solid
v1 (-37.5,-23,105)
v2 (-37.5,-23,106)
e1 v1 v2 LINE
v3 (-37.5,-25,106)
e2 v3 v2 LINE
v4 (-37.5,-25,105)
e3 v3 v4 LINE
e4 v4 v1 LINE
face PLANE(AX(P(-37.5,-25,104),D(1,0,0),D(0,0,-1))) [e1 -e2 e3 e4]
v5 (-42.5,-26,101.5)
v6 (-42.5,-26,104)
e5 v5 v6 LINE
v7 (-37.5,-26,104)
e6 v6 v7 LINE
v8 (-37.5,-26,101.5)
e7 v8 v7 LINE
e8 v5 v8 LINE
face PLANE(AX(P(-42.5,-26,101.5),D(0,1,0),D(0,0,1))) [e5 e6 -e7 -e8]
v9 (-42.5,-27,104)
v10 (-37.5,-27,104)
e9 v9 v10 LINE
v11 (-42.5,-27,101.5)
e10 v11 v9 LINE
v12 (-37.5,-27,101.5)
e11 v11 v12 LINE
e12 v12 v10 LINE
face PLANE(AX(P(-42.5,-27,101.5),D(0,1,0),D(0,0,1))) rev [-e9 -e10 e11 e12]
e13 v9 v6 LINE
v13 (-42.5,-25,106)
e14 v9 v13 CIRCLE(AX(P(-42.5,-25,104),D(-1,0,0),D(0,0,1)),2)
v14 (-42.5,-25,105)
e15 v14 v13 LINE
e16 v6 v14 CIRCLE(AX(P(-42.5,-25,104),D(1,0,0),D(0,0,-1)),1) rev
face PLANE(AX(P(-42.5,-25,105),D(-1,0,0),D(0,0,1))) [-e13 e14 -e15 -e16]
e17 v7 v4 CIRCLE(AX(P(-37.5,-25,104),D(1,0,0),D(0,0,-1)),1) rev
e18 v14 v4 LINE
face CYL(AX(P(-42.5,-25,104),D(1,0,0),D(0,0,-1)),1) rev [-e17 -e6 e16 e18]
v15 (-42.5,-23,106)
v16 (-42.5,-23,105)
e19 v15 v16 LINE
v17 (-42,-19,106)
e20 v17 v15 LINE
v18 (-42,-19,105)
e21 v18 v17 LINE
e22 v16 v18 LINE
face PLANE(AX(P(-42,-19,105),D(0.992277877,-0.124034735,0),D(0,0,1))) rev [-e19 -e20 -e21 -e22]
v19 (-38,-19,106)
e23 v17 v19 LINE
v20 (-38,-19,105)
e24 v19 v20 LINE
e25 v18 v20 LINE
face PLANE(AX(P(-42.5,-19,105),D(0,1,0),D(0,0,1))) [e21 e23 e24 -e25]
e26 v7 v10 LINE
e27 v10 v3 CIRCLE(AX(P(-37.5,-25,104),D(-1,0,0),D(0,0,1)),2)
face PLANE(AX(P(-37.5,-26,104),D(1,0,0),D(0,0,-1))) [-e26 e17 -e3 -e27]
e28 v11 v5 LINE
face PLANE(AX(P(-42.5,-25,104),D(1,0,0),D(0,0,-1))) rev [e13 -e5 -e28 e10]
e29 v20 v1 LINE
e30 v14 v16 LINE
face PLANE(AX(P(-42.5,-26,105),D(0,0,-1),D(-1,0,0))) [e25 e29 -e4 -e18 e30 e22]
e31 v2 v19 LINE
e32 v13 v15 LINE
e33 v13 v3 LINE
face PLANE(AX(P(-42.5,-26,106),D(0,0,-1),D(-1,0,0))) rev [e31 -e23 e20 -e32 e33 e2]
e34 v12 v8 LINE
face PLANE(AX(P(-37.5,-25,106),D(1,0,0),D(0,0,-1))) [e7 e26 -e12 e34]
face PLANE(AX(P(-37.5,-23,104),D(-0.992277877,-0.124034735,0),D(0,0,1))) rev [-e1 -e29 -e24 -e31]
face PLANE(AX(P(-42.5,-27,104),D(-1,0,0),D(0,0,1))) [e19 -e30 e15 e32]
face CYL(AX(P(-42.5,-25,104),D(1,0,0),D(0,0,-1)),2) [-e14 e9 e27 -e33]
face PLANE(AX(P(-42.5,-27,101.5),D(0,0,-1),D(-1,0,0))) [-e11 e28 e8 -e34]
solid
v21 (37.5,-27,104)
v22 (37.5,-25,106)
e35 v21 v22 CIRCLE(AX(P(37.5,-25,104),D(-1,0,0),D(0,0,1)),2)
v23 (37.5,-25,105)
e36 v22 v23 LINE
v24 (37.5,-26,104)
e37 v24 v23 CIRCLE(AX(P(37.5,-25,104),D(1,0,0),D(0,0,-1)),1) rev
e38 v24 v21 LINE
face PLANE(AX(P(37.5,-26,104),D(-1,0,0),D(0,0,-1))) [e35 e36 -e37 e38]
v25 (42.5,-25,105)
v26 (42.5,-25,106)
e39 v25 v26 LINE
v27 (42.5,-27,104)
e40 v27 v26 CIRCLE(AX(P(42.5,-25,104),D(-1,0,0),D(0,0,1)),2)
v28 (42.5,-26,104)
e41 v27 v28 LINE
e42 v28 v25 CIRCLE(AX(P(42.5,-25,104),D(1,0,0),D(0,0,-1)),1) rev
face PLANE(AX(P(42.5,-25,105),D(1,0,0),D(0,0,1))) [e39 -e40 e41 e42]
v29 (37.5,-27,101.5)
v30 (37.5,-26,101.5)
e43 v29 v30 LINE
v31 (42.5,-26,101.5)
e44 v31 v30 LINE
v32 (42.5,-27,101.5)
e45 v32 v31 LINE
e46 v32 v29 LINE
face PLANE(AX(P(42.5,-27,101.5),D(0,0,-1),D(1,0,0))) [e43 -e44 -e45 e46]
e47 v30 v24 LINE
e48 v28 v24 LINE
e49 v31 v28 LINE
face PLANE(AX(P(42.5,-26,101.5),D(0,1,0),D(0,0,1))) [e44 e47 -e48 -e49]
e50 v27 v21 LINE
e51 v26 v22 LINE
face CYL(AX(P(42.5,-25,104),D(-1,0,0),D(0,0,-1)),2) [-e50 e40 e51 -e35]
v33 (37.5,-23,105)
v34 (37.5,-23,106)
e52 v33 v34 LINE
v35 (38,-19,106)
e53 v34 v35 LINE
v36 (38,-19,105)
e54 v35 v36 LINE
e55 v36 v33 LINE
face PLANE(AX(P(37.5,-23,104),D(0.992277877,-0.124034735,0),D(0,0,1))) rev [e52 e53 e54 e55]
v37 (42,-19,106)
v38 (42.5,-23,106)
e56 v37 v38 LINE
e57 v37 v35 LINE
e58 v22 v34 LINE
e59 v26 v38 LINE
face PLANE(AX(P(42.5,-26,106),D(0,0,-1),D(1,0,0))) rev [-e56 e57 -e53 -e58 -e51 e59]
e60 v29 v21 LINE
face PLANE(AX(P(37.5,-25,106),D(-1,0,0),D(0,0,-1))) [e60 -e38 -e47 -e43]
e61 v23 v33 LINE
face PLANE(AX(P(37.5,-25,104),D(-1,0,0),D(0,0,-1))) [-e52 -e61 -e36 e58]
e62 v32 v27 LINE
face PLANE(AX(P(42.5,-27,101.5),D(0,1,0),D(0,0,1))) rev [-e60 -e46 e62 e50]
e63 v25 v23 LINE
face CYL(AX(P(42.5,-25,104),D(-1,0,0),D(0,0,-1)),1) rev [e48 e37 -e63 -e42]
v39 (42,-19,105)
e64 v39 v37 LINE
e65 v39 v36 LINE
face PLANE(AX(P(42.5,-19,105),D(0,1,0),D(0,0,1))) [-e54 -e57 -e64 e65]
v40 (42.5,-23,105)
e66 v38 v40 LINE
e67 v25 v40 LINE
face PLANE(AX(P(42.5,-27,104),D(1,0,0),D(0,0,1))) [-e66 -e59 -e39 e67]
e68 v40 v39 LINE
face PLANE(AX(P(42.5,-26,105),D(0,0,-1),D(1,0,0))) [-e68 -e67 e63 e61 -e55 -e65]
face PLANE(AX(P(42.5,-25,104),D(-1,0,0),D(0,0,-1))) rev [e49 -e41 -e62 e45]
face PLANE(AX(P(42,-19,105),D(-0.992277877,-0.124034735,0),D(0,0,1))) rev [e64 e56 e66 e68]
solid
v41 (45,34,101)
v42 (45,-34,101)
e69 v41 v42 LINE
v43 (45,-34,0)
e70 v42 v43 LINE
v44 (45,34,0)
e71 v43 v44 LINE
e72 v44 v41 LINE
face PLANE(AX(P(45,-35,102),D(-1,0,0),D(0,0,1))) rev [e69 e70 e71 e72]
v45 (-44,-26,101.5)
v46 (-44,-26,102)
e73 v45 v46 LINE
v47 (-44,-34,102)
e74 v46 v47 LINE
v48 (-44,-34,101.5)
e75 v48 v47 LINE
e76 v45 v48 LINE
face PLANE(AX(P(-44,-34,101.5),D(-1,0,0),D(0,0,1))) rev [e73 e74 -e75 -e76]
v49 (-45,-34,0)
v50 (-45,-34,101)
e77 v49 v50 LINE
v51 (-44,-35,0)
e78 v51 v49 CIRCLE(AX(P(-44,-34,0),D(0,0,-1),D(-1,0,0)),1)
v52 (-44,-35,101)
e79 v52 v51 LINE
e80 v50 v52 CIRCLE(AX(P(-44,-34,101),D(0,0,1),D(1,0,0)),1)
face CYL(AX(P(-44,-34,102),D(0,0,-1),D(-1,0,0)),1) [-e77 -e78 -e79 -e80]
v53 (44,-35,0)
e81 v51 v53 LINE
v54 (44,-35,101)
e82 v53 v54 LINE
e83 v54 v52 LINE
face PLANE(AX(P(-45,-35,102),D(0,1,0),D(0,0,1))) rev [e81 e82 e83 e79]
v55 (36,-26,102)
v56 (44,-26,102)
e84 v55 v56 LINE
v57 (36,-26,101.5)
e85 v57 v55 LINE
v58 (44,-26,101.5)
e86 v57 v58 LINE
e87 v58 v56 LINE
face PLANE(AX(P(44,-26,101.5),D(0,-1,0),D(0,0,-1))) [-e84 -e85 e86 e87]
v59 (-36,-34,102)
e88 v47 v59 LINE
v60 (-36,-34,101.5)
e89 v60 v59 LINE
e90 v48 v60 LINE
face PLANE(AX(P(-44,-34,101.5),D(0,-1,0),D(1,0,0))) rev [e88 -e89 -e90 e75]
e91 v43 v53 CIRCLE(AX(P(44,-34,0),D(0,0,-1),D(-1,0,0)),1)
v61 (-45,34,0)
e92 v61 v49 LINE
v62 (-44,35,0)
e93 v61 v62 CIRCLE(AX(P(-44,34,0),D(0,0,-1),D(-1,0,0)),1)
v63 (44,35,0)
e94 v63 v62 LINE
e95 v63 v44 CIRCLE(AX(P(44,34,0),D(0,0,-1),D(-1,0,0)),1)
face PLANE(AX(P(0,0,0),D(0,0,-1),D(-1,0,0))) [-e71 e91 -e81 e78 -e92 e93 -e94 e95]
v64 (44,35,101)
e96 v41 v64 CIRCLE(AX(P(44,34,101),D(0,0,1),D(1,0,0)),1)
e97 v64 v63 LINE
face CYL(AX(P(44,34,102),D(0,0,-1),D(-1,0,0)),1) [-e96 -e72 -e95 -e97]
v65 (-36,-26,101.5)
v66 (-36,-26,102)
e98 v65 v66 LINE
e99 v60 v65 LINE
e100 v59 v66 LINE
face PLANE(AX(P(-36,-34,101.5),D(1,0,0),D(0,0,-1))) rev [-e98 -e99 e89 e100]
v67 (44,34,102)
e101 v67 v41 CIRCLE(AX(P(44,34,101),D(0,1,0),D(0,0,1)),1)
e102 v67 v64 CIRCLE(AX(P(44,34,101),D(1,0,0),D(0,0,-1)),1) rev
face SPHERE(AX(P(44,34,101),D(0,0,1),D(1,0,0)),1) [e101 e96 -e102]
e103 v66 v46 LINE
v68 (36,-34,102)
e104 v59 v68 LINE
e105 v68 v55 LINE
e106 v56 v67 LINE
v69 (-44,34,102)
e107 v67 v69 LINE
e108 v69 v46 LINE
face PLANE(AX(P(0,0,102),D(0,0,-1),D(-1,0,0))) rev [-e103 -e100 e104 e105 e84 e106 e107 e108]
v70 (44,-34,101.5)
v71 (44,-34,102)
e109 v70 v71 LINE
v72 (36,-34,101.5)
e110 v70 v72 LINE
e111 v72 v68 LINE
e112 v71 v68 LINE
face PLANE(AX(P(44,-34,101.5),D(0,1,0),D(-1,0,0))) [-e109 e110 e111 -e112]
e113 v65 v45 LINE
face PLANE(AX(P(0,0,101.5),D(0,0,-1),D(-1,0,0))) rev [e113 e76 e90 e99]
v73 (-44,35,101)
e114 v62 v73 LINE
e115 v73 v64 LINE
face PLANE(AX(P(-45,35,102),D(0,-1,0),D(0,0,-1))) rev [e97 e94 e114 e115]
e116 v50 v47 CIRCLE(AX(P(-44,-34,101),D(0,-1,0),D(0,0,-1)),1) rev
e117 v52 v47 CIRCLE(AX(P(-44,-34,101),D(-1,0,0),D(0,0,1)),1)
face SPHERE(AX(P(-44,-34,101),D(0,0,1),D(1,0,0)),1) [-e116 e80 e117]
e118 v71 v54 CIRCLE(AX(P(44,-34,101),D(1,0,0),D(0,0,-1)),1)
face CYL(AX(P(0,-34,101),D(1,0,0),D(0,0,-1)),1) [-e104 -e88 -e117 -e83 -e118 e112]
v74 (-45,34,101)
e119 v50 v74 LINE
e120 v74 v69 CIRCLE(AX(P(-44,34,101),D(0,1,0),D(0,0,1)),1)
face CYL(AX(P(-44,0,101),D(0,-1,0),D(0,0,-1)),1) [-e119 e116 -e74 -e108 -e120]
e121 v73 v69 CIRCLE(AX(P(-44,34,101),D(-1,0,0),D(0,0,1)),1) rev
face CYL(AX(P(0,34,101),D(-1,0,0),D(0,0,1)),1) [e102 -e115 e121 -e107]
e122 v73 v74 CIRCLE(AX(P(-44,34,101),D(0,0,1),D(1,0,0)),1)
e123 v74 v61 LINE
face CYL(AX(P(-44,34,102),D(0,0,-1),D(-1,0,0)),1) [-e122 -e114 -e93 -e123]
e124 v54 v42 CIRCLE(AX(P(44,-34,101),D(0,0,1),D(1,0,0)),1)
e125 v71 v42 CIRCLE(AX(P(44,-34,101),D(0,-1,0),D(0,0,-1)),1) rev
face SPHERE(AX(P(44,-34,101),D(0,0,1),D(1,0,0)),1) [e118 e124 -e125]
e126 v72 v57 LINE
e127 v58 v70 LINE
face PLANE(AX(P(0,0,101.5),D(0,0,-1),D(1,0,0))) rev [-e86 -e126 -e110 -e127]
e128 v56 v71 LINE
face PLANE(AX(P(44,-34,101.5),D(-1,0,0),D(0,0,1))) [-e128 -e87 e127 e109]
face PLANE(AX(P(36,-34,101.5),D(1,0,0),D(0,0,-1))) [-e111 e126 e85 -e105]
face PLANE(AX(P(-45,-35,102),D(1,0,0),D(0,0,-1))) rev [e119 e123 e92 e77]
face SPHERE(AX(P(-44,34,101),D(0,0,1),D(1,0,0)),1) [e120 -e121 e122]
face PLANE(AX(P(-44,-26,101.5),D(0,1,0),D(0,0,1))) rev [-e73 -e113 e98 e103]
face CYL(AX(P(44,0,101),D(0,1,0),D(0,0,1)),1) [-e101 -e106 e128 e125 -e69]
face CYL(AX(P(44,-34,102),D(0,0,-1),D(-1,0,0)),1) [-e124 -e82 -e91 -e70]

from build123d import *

# Parameters (mm, degrees)
SKETCH_1_W             = 90
SKETCH_1_H             = 70
EXTRUDE_1_DEPTH        = 102
SKETCH_2_W             = 8
SKETCH_2_H             = 8
CUT_EXTRUDE_1_DEPTH    = 0.5
FILLET_1_R             = 1
SM_BASE_FLANGE_1_DEPTH = 5
CHAMFER_1_SIZE         = 0.5
CHAMFER_1_SIZE2        = 4
CHAMFER_2_SIZE         = 4
CHAMFER_2_SIZE2        = 0.5


with BuildPart() as part:
    # Sketch 1 → 填料-伸長1 (new body)
    with BuildSketch(Plane.XY):
        Rectangle(SKETCH_1_W, SKETCH_1_H)
    extrude(amount=EXTRUDE_1_DEPTH)

    # Sketch 2 → 除料-伸長1 (cut)
    with BuildSketch(Plane.XY.offset(102)):
        with Locations((-40, -30)):
            Rectangle(SKETCH_2_W, SKETCH_2_H)
    cut_extrude_1 = extrude(amount=-CUT_EXTRUDE_1_DEPTH, mode=Mode.SUBTRACT)

    # 鏡射1: 除料-伸長1 across plane
    add(cut_extrude_1.mirror(Plane(origin=(0, 0, 0), x_dir=(0, 0, 1), z_dir=(1, 0, 0))), mode=Mode.SUBTRACT)

    # 圓角1
    fillet_1_edges = [part.edges().sort_by_distance(p)[0] for p in [
        (-45, 0, 102),
        (0, -35, 102),
        (45, 0, 102),
        (0, 35, 102),
        (45, -35, 51),
        (-45, -35, 51),
        (-45, 35, 51),
        (45, 35, 51),
    ]]
    fillet(fillet_1_edges, radius=FILLET_1_R - 0.0001)  # a hair under: the kernel refuses the full size


with BuildPart() as body_2:
    # 基材-凸緣1: sheet metal written as solids
    # 草圖4 → 基材-凸緣1 (new body)
    with BuildSketch(Plane.ZY.offset(37.5)):
        with BuildLine():
            Line((101.5, -26), (104, -26))
            ThreePointArc((104, -26), (104.707106781, -25.707106781), (105, -25))
            Line((105, -25), (105, -19))
            Line((105, -19), (106, -19))
            Line((106, -19), (106, -25))
            ThreePointArc((106, -25), (105.414213562, -26.414213562), (104, -27))
            Line((104, -27), (101.5, -27))
            Line((101.5, -27), (101.5, -26))
        make_face()
    extrude(amount=SM_BASE_FLANGE_1_DEPTH)

    # 導角1
    chamfer_1_edges = [body_2.edges().sort_by_distance(p)[0] for p in [
        (-37.5, -19, 105.5),
    ]]
    chamfer_1_side = [body_2.faces().sort_by_distance(p)[0] for p in [
        (-40, -19, 105.5),
    ]]
    chamfer(chamfer_1_edges, length=CHAMFER_1_SIZE, length2=CHAMFER_1_SIZE2, reference=chamfer_1_side[0])

    # 導角2
    chamfer_2_edges = [body_2.edges().sort_by_distance(p)[0] for p in [
        (-42.5, -19, 105.5),
    ]]
    chamfer_2_side = [body_2.faces().sort_by_distance(p)[0] for p in [
        (-42.5, -26.908212201, 102.75),
    ]]
    chamfer(chamfer_2_edges, length=CHAMFER_2_SIZE, length2=CHAMFER_2_SIZE2, reference=chamfer_2_side[0])


with BuildPart() as body_3:
    # 鏡射2: read off the stored shape, not the designer's step
    # 鏡射2: mirrored copy
    add(body_2.part.mirror(Plane.YZ))


solid = Compound([part.part, body_2.part, body_3.part])
